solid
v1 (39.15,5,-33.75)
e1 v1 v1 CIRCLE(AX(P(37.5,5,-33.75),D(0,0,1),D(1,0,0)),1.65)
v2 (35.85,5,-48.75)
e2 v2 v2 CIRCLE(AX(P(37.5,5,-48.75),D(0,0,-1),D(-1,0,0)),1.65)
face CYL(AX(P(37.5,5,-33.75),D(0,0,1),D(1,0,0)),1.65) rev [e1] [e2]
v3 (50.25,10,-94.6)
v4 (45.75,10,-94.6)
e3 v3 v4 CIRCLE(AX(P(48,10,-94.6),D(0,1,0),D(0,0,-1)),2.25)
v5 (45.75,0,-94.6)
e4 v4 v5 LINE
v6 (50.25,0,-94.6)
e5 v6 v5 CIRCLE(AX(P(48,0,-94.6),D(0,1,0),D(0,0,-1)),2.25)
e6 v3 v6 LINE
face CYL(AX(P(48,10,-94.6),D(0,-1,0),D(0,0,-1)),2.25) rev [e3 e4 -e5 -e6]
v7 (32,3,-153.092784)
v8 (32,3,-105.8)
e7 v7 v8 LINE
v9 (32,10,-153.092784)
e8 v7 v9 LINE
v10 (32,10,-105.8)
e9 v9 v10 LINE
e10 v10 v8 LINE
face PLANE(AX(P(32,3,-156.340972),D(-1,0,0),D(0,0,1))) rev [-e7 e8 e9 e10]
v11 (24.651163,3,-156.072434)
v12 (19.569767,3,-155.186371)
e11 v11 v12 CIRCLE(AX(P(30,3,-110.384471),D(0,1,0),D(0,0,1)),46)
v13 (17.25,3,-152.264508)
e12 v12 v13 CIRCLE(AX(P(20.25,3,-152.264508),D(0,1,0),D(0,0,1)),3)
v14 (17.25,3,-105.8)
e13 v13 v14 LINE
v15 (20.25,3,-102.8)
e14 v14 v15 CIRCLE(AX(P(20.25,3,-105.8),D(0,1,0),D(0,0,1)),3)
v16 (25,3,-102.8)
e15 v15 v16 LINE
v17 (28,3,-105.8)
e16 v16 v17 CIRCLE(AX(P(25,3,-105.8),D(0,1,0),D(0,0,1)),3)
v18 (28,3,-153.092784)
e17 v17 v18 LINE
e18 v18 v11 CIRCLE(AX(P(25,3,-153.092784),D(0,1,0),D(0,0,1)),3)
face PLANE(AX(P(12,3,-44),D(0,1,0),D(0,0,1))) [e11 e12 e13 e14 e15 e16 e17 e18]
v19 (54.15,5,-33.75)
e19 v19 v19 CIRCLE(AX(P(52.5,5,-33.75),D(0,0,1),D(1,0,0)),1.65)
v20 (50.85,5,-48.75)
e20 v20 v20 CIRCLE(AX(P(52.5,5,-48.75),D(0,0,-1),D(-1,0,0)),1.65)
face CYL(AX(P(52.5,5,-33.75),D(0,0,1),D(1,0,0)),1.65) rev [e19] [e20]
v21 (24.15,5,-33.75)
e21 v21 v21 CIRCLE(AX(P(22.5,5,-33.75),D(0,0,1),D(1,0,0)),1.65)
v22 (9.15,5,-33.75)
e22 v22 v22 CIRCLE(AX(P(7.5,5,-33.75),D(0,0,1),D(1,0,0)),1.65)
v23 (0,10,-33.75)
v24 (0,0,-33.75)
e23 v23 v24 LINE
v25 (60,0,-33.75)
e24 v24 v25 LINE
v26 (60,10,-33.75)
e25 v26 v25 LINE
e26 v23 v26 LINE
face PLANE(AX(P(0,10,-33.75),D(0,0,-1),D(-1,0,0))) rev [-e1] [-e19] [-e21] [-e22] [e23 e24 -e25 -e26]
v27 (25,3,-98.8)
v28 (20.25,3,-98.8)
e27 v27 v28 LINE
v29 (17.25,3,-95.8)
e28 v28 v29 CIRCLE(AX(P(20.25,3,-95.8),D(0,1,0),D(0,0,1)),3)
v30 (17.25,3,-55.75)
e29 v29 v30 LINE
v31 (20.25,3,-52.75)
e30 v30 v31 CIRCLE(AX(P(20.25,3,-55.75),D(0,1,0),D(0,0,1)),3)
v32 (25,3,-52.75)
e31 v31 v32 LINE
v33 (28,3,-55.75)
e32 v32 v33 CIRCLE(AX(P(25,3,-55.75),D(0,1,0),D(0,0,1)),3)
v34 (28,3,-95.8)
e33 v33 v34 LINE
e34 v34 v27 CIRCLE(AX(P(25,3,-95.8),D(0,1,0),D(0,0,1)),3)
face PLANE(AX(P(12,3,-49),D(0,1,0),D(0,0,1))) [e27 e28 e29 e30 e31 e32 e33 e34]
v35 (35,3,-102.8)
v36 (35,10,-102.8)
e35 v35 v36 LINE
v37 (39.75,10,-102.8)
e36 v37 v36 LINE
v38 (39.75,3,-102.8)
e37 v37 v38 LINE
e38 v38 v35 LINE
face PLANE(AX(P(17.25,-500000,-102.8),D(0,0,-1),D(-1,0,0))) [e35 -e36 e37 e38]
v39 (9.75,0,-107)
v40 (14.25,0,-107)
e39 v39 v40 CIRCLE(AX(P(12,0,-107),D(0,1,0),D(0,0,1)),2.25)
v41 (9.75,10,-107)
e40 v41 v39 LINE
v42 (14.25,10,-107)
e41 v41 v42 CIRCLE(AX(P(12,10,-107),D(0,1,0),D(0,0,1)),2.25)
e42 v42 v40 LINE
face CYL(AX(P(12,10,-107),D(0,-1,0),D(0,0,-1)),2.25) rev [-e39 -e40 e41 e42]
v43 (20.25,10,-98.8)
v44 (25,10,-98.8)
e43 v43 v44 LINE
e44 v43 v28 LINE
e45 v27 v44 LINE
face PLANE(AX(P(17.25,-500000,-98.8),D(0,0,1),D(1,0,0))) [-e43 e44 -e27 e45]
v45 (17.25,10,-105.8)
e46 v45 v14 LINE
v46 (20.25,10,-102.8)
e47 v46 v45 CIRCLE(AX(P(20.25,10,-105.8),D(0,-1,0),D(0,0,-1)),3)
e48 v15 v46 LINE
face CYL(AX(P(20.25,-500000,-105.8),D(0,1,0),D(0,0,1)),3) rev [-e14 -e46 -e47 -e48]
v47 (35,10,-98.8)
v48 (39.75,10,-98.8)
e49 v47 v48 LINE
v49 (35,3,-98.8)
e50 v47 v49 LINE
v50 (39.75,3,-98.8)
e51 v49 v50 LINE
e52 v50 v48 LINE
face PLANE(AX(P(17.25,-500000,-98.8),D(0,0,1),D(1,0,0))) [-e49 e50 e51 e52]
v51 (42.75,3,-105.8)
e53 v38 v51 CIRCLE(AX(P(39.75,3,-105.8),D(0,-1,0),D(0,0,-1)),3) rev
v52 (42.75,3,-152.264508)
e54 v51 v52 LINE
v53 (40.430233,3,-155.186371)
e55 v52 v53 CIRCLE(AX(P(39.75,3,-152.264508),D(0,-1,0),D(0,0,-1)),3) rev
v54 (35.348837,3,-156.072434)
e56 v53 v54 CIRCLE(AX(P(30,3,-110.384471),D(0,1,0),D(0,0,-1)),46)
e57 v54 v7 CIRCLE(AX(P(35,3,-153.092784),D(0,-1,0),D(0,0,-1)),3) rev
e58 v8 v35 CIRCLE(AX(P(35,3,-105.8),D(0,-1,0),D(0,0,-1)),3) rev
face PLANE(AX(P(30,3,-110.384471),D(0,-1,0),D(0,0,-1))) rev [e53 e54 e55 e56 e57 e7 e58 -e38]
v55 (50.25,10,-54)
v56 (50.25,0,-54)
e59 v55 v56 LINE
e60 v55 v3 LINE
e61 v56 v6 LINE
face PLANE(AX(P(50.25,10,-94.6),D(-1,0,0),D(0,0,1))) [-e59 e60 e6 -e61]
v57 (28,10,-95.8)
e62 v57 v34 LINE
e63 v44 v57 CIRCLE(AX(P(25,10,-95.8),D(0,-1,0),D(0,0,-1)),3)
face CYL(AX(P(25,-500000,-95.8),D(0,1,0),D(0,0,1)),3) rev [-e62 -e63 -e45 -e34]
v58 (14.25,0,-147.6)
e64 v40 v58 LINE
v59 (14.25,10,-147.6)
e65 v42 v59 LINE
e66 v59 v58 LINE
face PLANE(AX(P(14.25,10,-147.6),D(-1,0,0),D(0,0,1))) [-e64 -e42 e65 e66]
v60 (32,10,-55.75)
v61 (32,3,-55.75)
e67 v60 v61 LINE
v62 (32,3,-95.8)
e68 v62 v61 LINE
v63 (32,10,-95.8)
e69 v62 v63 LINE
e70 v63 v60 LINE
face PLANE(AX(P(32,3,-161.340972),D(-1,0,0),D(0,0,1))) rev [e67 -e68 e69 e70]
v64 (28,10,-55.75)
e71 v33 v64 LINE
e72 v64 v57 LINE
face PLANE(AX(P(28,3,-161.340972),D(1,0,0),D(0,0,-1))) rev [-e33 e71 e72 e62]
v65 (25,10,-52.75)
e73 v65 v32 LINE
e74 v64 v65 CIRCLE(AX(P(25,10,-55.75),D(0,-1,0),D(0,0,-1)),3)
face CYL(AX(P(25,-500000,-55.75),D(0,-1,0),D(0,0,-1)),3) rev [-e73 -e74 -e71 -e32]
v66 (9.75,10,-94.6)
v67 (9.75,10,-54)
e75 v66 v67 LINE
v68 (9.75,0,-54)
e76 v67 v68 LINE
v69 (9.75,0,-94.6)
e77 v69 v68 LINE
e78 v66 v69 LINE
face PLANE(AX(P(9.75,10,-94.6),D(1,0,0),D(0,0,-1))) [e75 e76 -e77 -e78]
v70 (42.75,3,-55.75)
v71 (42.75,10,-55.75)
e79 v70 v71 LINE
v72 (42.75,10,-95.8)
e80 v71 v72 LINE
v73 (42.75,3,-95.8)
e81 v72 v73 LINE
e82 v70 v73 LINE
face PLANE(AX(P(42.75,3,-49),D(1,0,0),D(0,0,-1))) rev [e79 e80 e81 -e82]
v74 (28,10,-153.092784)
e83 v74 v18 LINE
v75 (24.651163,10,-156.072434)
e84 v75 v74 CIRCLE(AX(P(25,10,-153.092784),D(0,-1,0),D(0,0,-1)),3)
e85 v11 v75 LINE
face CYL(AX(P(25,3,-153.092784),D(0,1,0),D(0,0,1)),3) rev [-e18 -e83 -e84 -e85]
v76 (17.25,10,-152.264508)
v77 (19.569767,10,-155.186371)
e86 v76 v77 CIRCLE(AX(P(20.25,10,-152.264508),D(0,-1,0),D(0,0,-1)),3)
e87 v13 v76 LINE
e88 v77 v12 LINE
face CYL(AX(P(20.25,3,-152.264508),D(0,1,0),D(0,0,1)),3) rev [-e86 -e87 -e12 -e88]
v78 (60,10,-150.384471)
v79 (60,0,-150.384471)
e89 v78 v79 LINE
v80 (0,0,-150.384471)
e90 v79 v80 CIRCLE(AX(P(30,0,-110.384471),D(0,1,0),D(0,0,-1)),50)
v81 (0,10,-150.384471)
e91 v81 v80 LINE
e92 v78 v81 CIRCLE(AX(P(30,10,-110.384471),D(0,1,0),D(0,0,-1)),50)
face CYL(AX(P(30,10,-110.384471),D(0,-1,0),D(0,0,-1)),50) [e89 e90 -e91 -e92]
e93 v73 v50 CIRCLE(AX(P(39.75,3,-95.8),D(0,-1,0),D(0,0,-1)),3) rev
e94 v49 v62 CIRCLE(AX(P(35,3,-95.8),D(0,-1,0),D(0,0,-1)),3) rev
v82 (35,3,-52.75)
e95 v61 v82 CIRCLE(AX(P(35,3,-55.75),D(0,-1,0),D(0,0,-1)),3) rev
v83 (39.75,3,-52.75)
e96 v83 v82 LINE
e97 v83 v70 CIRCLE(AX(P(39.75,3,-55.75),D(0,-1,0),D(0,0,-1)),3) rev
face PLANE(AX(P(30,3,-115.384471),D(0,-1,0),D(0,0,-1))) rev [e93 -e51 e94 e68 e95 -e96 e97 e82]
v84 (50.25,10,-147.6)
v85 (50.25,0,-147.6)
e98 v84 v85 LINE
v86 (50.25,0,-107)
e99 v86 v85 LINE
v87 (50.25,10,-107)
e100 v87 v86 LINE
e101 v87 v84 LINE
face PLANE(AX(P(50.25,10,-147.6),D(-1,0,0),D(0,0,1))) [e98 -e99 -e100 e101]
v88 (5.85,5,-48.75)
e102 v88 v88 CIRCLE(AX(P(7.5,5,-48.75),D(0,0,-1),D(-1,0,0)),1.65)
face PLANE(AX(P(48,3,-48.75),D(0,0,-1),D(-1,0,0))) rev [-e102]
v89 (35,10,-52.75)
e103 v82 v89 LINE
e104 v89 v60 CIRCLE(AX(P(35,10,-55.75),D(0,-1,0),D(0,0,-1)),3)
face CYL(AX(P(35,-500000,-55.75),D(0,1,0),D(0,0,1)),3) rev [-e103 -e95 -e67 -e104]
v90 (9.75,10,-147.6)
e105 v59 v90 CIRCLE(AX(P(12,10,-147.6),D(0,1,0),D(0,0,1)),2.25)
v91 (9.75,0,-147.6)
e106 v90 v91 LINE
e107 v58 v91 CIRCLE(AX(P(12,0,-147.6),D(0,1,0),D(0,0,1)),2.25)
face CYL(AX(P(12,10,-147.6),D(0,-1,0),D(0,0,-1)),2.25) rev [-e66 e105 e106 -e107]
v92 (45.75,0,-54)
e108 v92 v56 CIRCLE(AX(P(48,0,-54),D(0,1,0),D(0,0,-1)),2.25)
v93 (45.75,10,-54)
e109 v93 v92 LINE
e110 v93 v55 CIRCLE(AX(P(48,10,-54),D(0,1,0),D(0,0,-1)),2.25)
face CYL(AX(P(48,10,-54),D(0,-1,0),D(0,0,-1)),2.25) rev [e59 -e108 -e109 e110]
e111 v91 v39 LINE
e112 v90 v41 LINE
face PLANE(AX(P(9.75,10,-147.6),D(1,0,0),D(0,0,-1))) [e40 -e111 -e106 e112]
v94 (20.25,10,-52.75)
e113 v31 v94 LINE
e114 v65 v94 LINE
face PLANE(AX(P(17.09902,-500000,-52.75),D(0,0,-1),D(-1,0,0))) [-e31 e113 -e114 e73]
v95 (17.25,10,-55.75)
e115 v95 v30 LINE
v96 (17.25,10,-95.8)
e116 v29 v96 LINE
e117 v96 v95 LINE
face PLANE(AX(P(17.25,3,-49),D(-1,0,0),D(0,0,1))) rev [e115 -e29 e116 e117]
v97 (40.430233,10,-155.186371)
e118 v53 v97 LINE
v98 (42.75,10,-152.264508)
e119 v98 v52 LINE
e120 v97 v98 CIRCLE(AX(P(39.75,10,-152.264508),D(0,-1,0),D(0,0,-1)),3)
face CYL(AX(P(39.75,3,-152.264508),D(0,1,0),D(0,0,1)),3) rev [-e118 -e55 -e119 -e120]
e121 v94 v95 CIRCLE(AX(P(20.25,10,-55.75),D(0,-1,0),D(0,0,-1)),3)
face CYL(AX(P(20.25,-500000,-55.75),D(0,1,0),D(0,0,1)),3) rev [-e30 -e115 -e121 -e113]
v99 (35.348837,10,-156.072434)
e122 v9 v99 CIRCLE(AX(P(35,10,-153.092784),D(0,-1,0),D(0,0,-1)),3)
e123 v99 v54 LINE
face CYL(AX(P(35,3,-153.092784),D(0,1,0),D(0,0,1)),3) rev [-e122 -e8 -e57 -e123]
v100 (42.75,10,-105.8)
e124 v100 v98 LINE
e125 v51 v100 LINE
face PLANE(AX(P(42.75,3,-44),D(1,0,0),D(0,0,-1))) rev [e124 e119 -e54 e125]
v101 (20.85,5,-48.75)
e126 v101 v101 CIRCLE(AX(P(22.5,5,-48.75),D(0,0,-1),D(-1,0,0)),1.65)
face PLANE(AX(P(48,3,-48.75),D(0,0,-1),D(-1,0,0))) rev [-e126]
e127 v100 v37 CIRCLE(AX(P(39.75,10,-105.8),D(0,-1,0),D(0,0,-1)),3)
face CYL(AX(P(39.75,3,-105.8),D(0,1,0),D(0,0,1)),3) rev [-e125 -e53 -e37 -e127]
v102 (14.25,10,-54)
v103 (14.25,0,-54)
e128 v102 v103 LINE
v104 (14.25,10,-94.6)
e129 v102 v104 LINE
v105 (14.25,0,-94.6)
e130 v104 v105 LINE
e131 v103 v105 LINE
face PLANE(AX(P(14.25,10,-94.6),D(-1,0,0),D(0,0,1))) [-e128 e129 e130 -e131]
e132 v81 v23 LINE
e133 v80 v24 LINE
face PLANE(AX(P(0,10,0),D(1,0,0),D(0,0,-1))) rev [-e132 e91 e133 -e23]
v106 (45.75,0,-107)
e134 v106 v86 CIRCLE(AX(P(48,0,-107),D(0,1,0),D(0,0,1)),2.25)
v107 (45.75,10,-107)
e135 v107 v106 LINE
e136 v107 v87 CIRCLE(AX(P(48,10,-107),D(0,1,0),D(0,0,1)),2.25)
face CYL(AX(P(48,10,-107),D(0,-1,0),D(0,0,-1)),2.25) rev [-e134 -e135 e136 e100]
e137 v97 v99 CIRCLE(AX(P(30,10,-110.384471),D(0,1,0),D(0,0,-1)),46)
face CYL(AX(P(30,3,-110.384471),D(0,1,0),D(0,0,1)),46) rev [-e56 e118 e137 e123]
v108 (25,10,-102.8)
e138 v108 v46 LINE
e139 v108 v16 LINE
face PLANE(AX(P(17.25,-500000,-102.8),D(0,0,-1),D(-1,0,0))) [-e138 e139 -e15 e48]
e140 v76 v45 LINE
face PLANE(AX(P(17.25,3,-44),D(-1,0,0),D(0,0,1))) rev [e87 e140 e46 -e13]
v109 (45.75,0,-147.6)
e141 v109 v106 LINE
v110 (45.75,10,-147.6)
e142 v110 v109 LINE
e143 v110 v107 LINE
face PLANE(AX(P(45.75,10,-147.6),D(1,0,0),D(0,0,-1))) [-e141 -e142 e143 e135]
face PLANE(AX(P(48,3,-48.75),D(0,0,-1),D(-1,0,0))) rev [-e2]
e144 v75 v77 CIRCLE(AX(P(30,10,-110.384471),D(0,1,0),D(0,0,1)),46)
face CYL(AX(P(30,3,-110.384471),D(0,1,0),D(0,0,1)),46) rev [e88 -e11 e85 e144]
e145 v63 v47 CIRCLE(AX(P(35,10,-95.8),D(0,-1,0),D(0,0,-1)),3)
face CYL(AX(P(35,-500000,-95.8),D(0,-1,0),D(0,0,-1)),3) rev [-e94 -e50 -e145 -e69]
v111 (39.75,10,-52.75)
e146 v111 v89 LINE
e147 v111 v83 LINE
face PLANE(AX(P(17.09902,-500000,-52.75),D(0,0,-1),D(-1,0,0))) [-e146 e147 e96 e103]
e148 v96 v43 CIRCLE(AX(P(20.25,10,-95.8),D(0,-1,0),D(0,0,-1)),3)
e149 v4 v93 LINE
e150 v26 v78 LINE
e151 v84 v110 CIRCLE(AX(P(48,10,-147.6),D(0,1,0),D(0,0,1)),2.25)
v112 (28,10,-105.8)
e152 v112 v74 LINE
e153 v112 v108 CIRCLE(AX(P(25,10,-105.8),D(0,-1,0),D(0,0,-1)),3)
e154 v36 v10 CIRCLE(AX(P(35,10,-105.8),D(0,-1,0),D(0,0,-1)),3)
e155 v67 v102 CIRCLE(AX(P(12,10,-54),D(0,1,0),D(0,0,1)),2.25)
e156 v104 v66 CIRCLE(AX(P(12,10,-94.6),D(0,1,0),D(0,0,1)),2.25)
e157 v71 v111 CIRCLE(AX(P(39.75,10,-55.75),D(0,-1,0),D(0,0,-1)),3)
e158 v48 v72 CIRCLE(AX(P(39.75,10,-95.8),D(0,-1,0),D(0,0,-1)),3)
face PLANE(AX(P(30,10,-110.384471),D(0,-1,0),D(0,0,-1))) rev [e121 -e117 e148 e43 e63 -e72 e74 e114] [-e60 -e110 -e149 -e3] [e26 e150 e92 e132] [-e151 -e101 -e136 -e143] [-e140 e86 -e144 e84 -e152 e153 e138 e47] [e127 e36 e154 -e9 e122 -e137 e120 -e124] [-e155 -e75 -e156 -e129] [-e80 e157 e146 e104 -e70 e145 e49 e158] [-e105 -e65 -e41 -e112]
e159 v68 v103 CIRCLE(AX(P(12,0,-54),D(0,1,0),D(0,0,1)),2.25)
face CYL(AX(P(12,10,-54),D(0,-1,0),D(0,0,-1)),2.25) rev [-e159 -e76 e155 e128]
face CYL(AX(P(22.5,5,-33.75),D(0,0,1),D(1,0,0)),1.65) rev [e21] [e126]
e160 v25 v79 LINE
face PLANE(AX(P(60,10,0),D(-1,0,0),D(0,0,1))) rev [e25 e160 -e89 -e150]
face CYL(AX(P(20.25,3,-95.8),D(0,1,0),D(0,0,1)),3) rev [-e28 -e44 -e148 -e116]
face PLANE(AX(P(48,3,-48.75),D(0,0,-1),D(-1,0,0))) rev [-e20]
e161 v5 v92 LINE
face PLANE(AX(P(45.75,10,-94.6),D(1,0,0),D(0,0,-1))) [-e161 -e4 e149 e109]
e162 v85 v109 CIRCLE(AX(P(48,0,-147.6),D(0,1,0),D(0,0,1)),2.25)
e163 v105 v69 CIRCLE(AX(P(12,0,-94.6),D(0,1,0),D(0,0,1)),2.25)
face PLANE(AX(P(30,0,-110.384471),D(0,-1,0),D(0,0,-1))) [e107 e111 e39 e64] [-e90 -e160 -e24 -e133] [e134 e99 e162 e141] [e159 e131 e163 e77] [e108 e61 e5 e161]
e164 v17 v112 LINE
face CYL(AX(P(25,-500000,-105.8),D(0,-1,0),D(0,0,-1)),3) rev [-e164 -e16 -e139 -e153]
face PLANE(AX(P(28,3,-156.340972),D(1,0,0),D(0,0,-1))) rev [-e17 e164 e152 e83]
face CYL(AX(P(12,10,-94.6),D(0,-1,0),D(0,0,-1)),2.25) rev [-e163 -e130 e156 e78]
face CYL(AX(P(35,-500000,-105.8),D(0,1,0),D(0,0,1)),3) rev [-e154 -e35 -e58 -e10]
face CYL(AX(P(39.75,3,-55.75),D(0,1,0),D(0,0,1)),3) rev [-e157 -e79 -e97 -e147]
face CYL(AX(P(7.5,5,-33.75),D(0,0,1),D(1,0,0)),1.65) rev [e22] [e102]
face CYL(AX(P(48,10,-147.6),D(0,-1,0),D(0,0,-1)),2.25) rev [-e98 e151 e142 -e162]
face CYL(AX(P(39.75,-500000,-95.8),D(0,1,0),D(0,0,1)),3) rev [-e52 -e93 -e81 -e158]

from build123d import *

# Parameters (mm, degrees)
EXTRUDE_1_DEPTH     = 10
CUT_EXTRUDE_1_DEPTH = 7
EXTRUDE_2_REACH     = 173.532
SKETCH_3_W          = 10.75
SKETCH_3_H          = 4
FILLET_1_R          = 3
M4X0_71_D           = 3.3
M4X0_71_DEPTH       = 15
SKETCH_9_W          = 60
SKETCH_9_H          = 23.75
SKETCH_9_H_2        = 5
CUT_EXTRUDE_2_DEPTH = 10


with BuildPart() as part:
    # Эскиз1 → Бобышка-Вытянуть1 (new body)
    with BuildSketch(Plane(origin=(0, 0, 0), x_dir=(1, 0, 0), z_dir=(0, 1, 0))):
        with BuildLine():
            Line((0, 0), (0, 150.384470983))
            ThreePointArc((0, 150.384470983), (30, 160.384470983), (60, 150.384470983))
            Line((60, 150.384470983), (60, 0))
            Line((60, 0), (0, 0))
        make_face()
        with BuildLine():
            Line((14.25, 147.6), (14.25, 102))
            ThreePointArc((14.25, 102), (12, 99.75), (9.75, 102))
            Line((9.75, 102), (9.75, 147.6))
            ThreePointArc((9.75, 147.6), (12, 149.85), (14.25, 147.6))
        make_face(mode=Mode.SUBTRACT)
        with BuildLine():
            Line((50.25, 147.6), (50.25, 102))
            ThreePointArc((50.25, 102), (48, 99.75), (45.75, 102))
            Line((45.75, 102), (45.75, 147.6))
            ThreePointArc((45.75, 147.6), (48, 149.85), (50.25, 147.6))
        make_face(mode=Mode.SUBTRACT)
        with BuildLine():
            Line((14.25, 89.6), (14.25, 44))
            ThreePointArc((14.25, 44), (12, 41.75), (9.75, 44))
            Line((9.75, 44), (9.75, 89.6))
            ThreePointArc((9.75, 89.6), (12, 91.85), (14.25, 89.6))
        make_face(mode=Mode.SUBTRACT)
        with BuildLine():
            Line((45.75, 89.6), (45.75, 44))
            ThreePointArc((45.75, 44), (48, 41.75), (50.25, 44))
            Line((50.25, 44), (50.25, 89.6))
            ThreePointArc((50.25, 89.6), (48, 91.85), (45.75, 89.6))
        make_face(mode=Mode.SUBTRACT)
    extrude(amount=EXTRUDE_1_DEPTH)

    # Эскиз2 → Вырез-Вытянуть1 (cut)
    with BuildSketch(Plane(origin=(0, 10, 0), x_dir=(1, 0, 0), z_dir=(0, 1, 0))):
        with BuildLine():
            Line((4, 15), (28, 15))
            Line((28, 15), (28, 156.340972156))
            ThreePointArc((28, 156.340972156), (22.572755404, 155.780902976), (17.25, 154.5821802))
            Line((17.25, 154.5821802), (17.25, 44))
            ThreePointArc((17.25, 44), (15.712310601, 40.287689399), (12, 38.75))
            Line((12, 38.75), (4, 38.75))
            Line((4, 38.75), (4, 15))
        make_face()
        with BuildLine():
            Line((56, 15), (32, 15))
            Line((32, 15), (32, 156.340972156))
            ThreePointArc((32, 156.340972156), (37.427244596, 155.780902976), (42.75, 154.5821802))
            Line((42.75, 154.5821802), (42.75, 44))
            ThreePointArc((42.75, 44), (44.287689399, 40.287689399), (48, 38.75))
            Line((48, 38.75), (56, 38.75))
            Line((56, 38.75), (56, 15))
        make_face()
    extrude(amount=-CUT_EXTRUDE_1_DEPTH, mode=Mode.SUBTRACT)

    # Эскиз3 → Бобышка-Вытянуть2 (add, up to next)
    with BuildSketch(Plane(origin=(0, 10, 0), x_dir=(1, 0, 0), z_dir=(0, 1, 0)), mode=Mode.PRIVATE) as extrude_2_sk1:
        with BuildLine():
            ThreePointArc((17.099019514, 42.75), (15.240370349, 39.86932209), (12, 38.75))
            Line((12, 38.75), (28, 38.75))
            Line((28, 38.75), (28, 42.75))
            Line((28, 42.75), (17.099019514, 42.75))
        make_face()
    extrude_2_tool1 = extrude(extrude_2_sk1.sketch, amount=-EXTRUDE_2_REACH, mode=Mode.PRIVATE) - part.part
    # Эскиз3 → Бобышка-Вытянуть2 (add, up to next)
    with BuildSketch(Plane(origin=(0, 10, 0), x_dir=(1, 0, 0), z_dir=(0, 1, 0)), mode=Mode.PRIVATE) as extrude_2_sk2:
        with BuildLine():
            Line((32, 42.75), (32, 38.75))
            Line((32, 38.75), (48, 38.75))
            ThreePointArc((48, 38.75), (44.759629651, 39.86932209), (42.900980486, 42.75))
            Line((42.900980486, 42.75), (32, 42.75))
        make_face()
    extrude_2_tool2 = extrude(extrude_2_sk2.sketch, amount=-EXTRUDE_2_REACH, mode=Mode.PRIVATE) - part.part
    # Эскиз3 → Бобышка-Вытянуть2 (add, up to next)
    with BuildSketch(Plane(origin=(0, 10, 0), x_dir=(1, 0, 0), z_dir=(0, 1, 0)), mode=Mode.PRIVATE) as extrude_2_sk3:
        with Locations((22.625, 95.8)):
            Rectangle(SKETCH_3_W, SKETCH_3_H)
    extrude_2_tool3 = extrude(extrude_2_sk3.sketch, amount=-EXTRUDE_2_REACH, mode=Mode.PRIVATE) - part.part
    # Эскиз3 → Бобышка-Вытянуть2 (add, up to next)
    with BuildSketch(Plane(origin=(0, 10, 0), x_dir=(1, 0, 0), z_dir=(0, 1, 0)), mode=Mode.PRIVATE) as extrude_2_sk4:
        with Locations((37.375, 95.8)):
            Rectangle(SKETCH_3_W, SKETCH_3_H)
    extrude_2_tool4 = extrude(extrude_2_sk4.sketch, amount=-EXTRUDE_2_REACH, mode=Mode.PRIVATE) - part.part
    add(extrude_2_tool1.solids().sort_by_distance((21.839158, 10, -40.64687))[0])
    add(extrude_2_tool2.solids().sort_by_distance((38.160842, 10, -40.64687))[0])
    add(extrude_2_tool3.solids().sort_by_distance((22.625, 10, -95.8))[0])
    add(extrude_2_tool4.solids().sort_by_distance((37.375, 10, -95.8))[0])

    # Скругление1
    fillet_1_edges = [part.edges().sort_by_distance(p)[0] for p in [
        (32, 6.5, -38.75),
        (56, 6.5, -38.75),
        (56, 6.5, -15),
        (32, 6.5, -15),
        (4, 6.5, -15),
        (28, 6.5, -15),
        (28, 6.5, -38.75),
        (4, 6.5, -38.75),
        (17.25, 6.5, -93.8),
        (28, 6.5, -93.8),
        (17.099019514, 6.5, -42.75),
        (28, 6.5, -42.75),
        (32, 6.5, -42.75),
        (42.900980486, 6.5, -42.75),
        (42.75, 6.5, -93.8),
        (32, 6.5, -93.8),
        (32, 6.5, -156.340972156),
        (42.75, 6.5, -154.5821802),
        (42.75, 6.5, -97.8),
        (32, 6.5, -97.8),
        (17.25, 6.5, -97.8),
        (28, 6.5, -97.8),
        (17.25, 6.5, -154.5821802),
        (28, 6.5, -156.340972156),
    ]]
    fillet(fillet_1_edges, radius=FILLET_1_R)

    # Отверстие обработанное метчиком M4x0.71
    with Locations(Plane.XY):
        with Locations((7.5, 5), (22.5, 5), (37.5, 5), (52.5, 5)):
            Hole(M4X0_71_D / 2, depth=M4X0_71_DEPTH)

    # Эскиз9 → Вырез-Вытянуть2 (cut)
    with BuildSketch(Plane(origin=(0, 10, 0), x_dir=(1, 0, 0), z_dir=(0, 1, 0))):
        with Locations((30, 26.875)):
            Rectangle(SKETCH_9_W, SKETCH_9_H)
        with Locations((30, 74.766509245)):
            Rectangle(SKETCH_9_W, SKETCH_9_H_2)
        with Locations((30, 134.003959037)):
            Rectangle(SKETCH_9_W, SKETCH_9_H_2)
    extrude(amount=-CUT_EXTRUDE_2_DEPTH, mode=Mode.SUBTRACT)


with BuildPart() as cut_extrude_2_piece_1:
    # of the separate pieces the step leaves, piece 1, a body of its own (cut_extrude_2_pieces)
    add(part.part.solids().sort_by_distance((60, 10, -131.503959037))[0])


with BuildPart() as cut_extrude_2_piece_2:
    # of the separate pieces the step leaves, piece 2, a body of its own (cut_extrude_2_pieces)
    add(part.part.solids().sort_by_distance((60, 10, -72.266509245))[0])


with BuildPart() as cut_extrude_2_piece_3:
    # of the separate pieces the step leaves, piece 3, a body of its own (cut_extrude_2_pieces)
    add(part.part.solids().sort_by_distance((0, 10, 0))[0])


with BuildPart() as cut_extrude_2_piece_4:
    # of the separate pieces the step leaves, piece 4, a body of its own (cut_extrude_2_pieces)
    add(part.part.solids().sort_by_distance((60, 10, -150.384470983))[0])


with BuildPart() as cut_extrude_2_piece_1_1:
    # Move Body 1: read off the stored shape, not the designer's step
    # Move Body 1: moved
    add(cut_extrude_2_piece_1.part.moved(Location((0, 0, -5))))


with BuildPart() as cut_extrude_2_piece_2_1:
    # Move Body 2: read off the stored shape, not the designer's step
    # Move Body 2: moved
    add(cut_extrude_2_piece_2.part.moved(Location((0, 0, -10))))


with BuildPart() as cut_extrude_2_piece_3_1:
    # Move Body 3: read off the stored shape, not the designer's step
    # Move Body 3: moved
    add(cut_extrude_2_piece_3.part.moved(Location((0, 0, -33.75))))


with BuildPart() as cut_extrude_2_piece_4_1:
    add(cut_extrude_2_piece_4.part)

    # Combine 1: union Вырез-Вытянуть2 piece 1, Вырез-Вытянуть2 piece 2, Вырез-Вытянуть2 piece 3
    add(cut_extrude_2_piece_1_1.part)
    add(cut_extrude_2_piece_2_1.part)
    add(cut_extrude_2_piece_3_1.part)


solid = cut_extrude_2_piece_4_1.part
